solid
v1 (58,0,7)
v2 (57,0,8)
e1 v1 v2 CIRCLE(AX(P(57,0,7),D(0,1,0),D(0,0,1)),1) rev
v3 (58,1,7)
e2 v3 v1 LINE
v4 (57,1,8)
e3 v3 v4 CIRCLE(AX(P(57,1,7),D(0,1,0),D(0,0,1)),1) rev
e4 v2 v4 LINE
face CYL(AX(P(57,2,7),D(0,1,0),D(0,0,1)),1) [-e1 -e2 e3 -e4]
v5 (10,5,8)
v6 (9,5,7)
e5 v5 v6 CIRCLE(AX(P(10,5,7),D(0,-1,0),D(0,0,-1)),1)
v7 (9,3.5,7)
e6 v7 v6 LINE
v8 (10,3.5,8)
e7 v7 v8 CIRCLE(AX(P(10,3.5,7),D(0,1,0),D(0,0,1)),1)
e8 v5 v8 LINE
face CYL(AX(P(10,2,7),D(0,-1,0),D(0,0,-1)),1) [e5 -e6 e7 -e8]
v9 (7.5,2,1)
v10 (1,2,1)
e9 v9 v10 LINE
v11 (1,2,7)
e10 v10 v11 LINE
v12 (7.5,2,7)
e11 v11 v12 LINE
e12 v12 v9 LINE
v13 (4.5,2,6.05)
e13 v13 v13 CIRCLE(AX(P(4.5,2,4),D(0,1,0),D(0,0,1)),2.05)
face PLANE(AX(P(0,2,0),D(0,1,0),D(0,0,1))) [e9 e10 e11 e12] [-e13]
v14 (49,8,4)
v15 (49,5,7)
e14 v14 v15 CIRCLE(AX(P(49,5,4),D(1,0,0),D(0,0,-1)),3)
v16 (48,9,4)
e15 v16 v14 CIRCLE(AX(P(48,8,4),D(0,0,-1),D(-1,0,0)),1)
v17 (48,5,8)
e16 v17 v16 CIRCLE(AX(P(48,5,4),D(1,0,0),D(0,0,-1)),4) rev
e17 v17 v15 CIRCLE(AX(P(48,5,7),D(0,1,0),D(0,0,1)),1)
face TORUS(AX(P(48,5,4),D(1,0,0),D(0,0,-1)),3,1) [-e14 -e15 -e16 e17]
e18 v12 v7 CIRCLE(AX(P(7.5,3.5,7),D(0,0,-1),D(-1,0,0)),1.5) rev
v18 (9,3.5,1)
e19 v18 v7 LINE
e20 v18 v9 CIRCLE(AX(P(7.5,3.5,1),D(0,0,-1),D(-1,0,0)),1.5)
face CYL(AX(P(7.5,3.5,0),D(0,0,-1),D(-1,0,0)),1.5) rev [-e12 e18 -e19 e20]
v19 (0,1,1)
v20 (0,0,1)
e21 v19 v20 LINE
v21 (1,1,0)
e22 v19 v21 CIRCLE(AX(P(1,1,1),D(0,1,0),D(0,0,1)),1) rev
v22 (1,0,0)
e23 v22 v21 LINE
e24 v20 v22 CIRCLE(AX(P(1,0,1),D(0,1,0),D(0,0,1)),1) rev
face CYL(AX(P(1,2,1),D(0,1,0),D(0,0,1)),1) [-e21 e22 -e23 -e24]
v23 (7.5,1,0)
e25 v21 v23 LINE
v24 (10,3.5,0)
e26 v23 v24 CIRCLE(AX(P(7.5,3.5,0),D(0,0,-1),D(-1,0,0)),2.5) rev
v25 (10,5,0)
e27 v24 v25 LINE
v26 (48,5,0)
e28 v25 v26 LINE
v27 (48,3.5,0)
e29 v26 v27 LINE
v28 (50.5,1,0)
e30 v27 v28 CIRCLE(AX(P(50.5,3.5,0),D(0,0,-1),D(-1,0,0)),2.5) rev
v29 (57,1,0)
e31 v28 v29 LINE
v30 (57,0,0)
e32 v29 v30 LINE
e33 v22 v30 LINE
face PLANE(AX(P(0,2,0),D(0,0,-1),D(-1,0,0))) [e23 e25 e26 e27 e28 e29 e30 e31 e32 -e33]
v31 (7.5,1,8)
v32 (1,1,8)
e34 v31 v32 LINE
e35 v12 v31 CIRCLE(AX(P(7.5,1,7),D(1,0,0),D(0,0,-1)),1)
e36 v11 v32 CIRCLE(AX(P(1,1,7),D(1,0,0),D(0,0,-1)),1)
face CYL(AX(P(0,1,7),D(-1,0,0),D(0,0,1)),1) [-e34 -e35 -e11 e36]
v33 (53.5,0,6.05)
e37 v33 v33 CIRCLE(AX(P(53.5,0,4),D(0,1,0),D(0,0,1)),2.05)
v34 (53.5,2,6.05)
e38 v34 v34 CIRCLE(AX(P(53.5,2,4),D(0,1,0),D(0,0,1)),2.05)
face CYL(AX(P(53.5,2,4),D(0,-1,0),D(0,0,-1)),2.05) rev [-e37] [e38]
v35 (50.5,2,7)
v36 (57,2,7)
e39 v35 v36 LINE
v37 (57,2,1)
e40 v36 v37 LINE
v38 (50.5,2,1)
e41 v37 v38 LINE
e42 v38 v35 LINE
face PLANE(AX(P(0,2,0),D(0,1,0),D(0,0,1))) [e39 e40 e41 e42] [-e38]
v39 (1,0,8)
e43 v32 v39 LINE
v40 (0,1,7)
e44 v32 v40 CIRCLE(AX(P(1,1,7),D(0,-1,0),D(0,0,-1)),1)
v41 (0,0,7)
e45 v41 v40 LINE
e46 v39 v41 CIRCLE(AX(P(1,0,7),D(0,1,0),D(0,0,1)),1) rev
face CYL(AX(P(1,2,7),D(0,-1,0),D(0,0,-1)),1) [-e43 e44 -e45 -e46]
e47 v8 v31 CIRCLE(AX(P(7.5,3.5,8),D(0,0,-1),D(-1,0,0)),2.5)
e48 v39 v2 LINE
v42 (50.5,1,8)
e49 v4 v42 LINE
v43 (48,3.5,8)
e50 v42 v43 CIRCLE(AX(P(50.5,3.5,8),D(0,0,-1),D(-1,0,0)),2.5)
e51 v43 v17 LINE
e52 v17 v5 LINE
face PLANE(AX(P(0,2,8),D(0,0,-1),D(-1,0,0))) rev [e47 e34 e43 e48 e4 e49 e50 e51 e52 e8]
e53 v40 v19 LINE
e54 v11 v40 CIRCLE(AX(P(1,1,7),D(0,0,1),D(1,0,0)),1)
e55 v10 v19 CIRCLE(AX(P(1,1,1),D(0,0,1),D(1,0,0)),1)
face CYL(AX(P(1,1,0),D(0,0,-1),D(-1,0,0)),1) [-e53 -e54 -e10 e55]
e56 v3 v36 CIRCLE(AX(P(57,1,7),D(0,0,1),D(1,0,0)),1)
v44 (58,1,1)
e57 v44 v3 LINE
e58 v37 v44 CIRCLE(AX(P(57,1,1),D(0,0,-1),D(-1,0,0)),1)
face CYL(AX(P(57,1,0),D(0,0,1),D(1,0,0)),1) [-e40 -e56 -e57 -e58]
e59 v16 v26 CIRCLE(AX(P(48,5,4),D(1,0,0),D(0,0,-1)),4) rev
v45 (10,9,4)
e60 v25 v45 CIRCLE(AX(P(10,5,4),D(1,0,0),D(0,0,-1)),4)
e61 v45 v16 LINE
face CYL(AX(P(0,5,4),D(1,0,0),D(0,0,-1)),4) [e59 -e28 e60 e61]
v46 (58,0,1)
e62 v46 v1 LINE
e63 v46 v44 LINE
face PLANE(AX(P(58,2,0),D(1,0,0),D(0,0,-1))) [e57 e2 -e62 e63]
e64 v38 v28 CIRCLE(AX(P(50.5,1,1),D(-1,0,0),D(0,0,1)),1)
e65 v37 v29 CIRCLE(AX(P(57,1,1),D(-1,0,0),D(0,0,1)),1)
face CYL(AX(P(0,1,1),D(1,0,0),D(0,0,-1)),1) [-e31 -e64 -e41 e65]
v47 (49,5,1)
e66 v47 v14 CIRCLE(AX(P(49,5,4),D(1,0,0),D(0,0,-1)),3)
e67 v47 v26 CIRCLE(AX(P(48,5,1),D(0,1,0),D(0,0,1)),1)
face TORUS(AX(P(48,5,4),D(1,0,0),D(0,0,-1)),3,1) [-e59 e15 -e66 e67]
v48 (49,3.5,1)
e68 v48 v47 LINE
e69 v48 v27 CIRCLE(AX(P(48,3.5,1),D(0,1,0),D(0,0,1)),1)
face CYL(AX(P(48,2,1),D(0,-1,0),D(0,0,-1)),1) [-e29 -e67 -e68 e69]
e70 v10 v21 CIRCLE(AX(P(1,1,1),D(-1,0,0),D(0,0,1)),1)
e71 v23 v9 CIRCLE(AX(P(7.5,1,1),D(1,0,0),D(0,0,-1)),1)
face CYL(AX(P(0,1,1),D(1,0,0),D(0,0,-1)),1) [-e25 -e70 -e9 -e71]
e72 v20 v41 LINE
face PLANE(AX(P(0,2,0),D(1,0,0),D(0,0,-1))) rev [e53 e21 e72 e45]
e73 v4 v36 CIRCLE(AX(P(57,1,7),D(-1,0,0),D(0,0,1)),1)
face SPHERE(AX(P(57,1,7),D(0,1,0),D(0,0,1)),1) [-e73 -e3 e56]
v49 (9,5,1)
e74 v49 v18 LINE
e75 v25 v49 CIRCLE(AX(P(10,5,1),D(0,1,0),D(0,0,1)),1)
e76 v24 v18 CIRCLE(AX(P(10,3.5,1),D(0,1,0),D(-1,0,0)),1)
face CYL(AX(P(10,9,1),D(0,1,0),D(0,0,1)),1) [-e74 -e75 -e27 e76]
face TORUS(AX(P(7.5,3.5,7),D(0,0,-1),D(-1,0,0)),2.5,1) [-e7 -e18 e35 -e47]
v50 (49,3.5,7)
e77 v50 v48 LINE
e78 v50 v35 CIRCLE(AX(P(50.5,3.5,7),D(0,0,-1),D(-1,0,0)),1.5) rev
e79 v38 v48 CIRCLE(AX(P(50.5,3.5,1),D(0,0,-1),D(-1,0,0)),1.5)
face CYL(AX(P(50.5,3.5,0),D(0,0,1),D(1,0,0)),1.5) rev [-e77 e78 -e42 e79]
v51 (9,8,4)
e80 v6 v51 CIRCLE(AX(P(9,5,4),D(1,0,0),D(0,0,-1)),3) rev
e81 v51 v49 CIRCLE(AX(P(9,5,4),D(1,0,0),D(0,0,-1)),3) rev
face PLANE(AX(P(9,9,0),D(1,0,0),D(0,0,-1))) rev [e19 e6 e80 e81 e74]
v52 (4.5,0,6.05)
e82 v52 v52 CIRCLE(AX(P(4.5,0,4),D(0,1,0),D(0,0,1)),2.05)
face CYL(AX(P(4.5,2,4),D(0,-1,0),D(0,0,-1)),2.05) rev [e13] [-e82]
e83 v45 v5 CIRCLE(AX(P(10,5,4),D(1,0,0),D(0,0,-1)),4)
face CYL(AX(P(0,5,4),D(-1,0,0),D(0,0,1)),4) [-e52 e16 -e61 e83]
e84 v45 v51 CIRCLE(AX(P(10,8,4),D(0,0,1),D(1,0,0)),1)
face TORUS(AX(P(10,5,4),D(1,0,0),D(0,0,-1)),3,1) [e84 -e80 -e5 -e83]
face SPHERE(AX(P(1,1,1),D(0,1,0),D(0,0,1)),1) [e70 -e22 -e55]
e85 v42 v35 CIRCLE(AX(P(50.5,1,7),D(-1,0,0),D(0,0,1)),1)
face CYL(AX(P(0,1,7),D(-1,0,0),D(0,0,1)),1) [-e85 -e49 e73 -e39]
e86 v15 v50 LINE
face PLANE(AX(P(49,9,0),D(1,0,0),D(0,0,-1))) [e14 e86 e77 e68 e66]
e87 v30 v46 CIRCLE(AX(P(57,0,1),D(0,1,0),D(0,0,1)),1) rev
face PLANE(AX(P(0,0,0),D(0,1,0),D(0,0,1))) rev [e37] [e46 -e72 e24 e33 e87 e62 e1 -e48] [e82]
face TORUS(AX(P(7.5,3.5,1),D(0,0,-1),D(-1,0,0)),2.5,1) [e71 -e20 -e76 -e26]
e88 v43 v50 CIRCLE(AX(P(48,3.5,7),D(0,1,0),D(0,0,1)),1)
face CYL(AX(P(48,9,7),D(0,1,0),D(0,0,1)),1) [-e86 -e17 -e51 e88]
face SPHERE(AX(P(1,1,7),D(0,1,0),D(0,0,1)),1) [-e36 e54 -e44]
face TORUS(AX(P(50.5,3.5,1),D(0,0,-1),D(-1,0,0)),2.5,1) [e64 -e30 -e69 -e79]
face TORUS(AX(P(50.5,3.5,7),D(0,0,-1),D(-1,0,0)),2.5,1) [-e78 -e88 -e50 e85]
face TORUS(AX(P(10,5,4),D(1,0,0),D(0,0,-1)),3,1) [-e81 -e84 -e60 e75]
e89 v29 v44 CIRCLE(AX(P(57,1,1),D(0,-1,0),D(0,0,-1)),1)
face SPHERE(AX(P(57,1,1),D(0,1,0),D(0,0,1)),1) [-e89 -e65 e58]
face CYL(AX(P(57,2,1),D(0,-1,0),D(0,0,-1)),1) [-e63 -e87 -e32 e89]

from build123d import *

# Parameters (mm, degrees)
SKETCH1_W           = 40
SKETCH1_H           = 8
SKETCH1_W_2         = 9
SKETCH1_R           = 2.05
BOSS_EXTRUDE1_DEPTH = 2
SKETCH1_3_W         = 40
SKETCH1_3_H         = 8
BOSS_EXTRUDE2_DEPTH = 9
FILLET1_R           = 4
FILLET2_R           = 1
FILLET4_R           = 1.5
FILLET5_R           = 1


with BuildPart() as part:
    # Sketch1 → Boss-Extrude1 (new body)
    # profile 1 of 3: a face of its own
    with BuildSketch(Plane(origin=(0, 0, 0), x_dir=(1, 0, 0), z_dir=(0, 1, 0))):
        with Locations((29, -4)):
            Rectangle(SKETCH1_W, SKETCH1_H)
    # profile 2 of 3: a face of its own
    with BuildSketch(Plane(origin=(0, 0, 0), x_dir=(1, 0, 0), z_dir=(0, 1, 0))):
        with Locations((4.5, -4)):
            Rectangle(SKETCH1_W_2, SKETCH1_H)
        with Locations(Location((4.5, -4, 0), (0, 0, 270))):
            Circle(SKETCH1_R, mode=Mode.SUBTRACT)
    # profile 3 of 3: a face of its own
    with BuildSketch(Plane(origin=(0, 0, 0), x_dir=(1, 0, 0), z_dir=(0, 1, 0))):
        with Locations((53.5, -4)):
            Rectangle(SKETCH1_W_2, SKETCH1_H)
        with Locations(Location((53.5, -4, 0), (0, 0, 270))):
            Circle(SKETCH1_R, mode=Mode.SUBTRACT)
    extrude(amount=BOSS_EXTRUDE1_DEPTH)

    # Sketch1<3> → Boss-Extrude2 (add)
    with BuildSketch(Plane(origin=(0, 0, 0), x_dir=(1, 0, 0), z_dir=(0, 1, 0))):
        with Locations((29, -4)):
            Rectangle(SKETCH1_3_W, SKETCH1_3_H)
    extrude(amount=BOSS_EXTRUDE2_DEPTH)

    # Fillet1
    fillet1_edges = [part.edges().sort_by_distance(p)[0] for p in [
        (29, 9, 0),
        (29, 9, 8),
    ]]
    fillet(fillet1_edges, radius=FILLET1_R - 0.0001)  # a hair under: the kernel refuses the full size

    # Fillet2
    fillet2_edges = [part.edges().sort_by_distance(p)[0] for p in [
        (0, 1, 8),
        (0, 1, 0),
        (58, 1, 0),
        (58, 1, 8),
    ]]
    fillet(fillet2_edges, radius=FILLET2_R)

    # Fillet4
    fillet4_edges = [part.edges().sort_by_distance(p)[0] for p in [
        (9, 2, 4),
        (49, 2, 4),
    ]]
    fillet(fillet4_edges, radius=FILLET4_R)

    # Fillet5
    fillet5_edges = [part.edges().sort_by_distance(p)[0] for p in [
        (9, 4.25005, 0),
        (49, 4.25005, 0),
        (49, 4.25005, 8),
        (49, 7.828456414, 6.828456414),
        (49, 7.828456414, 1.171543586),
        (9, 4.25005, 8),
        (9, 7.828456414, 6.828456414),
        (9, 7.828456414, 1.171543586),
        (4.25, 2, 0),
        (58, 2, 4),
        (57.707106781, 2, 7.707106781),
        (57.707106781, 2, 0.292893219),
        (4.25, 2, 8),
        (0, 2, 4),
        (0.292893219, 2, 7.707106781),
        (0.292893219, 2, 0.292893219),
        (53.75, 2, 0),
        (53.75, 2, 8),
        (49.439339828, 2.439339828, 0),
        (49.439339828, 2.439339828, 8),
        (8.560660172, 2.439339828, 0),
        (8.560660172, 2.439339828, 8),
    ]]
    fillet(fillet5_edges, radius=FILLET5_R)


solid = part.part
